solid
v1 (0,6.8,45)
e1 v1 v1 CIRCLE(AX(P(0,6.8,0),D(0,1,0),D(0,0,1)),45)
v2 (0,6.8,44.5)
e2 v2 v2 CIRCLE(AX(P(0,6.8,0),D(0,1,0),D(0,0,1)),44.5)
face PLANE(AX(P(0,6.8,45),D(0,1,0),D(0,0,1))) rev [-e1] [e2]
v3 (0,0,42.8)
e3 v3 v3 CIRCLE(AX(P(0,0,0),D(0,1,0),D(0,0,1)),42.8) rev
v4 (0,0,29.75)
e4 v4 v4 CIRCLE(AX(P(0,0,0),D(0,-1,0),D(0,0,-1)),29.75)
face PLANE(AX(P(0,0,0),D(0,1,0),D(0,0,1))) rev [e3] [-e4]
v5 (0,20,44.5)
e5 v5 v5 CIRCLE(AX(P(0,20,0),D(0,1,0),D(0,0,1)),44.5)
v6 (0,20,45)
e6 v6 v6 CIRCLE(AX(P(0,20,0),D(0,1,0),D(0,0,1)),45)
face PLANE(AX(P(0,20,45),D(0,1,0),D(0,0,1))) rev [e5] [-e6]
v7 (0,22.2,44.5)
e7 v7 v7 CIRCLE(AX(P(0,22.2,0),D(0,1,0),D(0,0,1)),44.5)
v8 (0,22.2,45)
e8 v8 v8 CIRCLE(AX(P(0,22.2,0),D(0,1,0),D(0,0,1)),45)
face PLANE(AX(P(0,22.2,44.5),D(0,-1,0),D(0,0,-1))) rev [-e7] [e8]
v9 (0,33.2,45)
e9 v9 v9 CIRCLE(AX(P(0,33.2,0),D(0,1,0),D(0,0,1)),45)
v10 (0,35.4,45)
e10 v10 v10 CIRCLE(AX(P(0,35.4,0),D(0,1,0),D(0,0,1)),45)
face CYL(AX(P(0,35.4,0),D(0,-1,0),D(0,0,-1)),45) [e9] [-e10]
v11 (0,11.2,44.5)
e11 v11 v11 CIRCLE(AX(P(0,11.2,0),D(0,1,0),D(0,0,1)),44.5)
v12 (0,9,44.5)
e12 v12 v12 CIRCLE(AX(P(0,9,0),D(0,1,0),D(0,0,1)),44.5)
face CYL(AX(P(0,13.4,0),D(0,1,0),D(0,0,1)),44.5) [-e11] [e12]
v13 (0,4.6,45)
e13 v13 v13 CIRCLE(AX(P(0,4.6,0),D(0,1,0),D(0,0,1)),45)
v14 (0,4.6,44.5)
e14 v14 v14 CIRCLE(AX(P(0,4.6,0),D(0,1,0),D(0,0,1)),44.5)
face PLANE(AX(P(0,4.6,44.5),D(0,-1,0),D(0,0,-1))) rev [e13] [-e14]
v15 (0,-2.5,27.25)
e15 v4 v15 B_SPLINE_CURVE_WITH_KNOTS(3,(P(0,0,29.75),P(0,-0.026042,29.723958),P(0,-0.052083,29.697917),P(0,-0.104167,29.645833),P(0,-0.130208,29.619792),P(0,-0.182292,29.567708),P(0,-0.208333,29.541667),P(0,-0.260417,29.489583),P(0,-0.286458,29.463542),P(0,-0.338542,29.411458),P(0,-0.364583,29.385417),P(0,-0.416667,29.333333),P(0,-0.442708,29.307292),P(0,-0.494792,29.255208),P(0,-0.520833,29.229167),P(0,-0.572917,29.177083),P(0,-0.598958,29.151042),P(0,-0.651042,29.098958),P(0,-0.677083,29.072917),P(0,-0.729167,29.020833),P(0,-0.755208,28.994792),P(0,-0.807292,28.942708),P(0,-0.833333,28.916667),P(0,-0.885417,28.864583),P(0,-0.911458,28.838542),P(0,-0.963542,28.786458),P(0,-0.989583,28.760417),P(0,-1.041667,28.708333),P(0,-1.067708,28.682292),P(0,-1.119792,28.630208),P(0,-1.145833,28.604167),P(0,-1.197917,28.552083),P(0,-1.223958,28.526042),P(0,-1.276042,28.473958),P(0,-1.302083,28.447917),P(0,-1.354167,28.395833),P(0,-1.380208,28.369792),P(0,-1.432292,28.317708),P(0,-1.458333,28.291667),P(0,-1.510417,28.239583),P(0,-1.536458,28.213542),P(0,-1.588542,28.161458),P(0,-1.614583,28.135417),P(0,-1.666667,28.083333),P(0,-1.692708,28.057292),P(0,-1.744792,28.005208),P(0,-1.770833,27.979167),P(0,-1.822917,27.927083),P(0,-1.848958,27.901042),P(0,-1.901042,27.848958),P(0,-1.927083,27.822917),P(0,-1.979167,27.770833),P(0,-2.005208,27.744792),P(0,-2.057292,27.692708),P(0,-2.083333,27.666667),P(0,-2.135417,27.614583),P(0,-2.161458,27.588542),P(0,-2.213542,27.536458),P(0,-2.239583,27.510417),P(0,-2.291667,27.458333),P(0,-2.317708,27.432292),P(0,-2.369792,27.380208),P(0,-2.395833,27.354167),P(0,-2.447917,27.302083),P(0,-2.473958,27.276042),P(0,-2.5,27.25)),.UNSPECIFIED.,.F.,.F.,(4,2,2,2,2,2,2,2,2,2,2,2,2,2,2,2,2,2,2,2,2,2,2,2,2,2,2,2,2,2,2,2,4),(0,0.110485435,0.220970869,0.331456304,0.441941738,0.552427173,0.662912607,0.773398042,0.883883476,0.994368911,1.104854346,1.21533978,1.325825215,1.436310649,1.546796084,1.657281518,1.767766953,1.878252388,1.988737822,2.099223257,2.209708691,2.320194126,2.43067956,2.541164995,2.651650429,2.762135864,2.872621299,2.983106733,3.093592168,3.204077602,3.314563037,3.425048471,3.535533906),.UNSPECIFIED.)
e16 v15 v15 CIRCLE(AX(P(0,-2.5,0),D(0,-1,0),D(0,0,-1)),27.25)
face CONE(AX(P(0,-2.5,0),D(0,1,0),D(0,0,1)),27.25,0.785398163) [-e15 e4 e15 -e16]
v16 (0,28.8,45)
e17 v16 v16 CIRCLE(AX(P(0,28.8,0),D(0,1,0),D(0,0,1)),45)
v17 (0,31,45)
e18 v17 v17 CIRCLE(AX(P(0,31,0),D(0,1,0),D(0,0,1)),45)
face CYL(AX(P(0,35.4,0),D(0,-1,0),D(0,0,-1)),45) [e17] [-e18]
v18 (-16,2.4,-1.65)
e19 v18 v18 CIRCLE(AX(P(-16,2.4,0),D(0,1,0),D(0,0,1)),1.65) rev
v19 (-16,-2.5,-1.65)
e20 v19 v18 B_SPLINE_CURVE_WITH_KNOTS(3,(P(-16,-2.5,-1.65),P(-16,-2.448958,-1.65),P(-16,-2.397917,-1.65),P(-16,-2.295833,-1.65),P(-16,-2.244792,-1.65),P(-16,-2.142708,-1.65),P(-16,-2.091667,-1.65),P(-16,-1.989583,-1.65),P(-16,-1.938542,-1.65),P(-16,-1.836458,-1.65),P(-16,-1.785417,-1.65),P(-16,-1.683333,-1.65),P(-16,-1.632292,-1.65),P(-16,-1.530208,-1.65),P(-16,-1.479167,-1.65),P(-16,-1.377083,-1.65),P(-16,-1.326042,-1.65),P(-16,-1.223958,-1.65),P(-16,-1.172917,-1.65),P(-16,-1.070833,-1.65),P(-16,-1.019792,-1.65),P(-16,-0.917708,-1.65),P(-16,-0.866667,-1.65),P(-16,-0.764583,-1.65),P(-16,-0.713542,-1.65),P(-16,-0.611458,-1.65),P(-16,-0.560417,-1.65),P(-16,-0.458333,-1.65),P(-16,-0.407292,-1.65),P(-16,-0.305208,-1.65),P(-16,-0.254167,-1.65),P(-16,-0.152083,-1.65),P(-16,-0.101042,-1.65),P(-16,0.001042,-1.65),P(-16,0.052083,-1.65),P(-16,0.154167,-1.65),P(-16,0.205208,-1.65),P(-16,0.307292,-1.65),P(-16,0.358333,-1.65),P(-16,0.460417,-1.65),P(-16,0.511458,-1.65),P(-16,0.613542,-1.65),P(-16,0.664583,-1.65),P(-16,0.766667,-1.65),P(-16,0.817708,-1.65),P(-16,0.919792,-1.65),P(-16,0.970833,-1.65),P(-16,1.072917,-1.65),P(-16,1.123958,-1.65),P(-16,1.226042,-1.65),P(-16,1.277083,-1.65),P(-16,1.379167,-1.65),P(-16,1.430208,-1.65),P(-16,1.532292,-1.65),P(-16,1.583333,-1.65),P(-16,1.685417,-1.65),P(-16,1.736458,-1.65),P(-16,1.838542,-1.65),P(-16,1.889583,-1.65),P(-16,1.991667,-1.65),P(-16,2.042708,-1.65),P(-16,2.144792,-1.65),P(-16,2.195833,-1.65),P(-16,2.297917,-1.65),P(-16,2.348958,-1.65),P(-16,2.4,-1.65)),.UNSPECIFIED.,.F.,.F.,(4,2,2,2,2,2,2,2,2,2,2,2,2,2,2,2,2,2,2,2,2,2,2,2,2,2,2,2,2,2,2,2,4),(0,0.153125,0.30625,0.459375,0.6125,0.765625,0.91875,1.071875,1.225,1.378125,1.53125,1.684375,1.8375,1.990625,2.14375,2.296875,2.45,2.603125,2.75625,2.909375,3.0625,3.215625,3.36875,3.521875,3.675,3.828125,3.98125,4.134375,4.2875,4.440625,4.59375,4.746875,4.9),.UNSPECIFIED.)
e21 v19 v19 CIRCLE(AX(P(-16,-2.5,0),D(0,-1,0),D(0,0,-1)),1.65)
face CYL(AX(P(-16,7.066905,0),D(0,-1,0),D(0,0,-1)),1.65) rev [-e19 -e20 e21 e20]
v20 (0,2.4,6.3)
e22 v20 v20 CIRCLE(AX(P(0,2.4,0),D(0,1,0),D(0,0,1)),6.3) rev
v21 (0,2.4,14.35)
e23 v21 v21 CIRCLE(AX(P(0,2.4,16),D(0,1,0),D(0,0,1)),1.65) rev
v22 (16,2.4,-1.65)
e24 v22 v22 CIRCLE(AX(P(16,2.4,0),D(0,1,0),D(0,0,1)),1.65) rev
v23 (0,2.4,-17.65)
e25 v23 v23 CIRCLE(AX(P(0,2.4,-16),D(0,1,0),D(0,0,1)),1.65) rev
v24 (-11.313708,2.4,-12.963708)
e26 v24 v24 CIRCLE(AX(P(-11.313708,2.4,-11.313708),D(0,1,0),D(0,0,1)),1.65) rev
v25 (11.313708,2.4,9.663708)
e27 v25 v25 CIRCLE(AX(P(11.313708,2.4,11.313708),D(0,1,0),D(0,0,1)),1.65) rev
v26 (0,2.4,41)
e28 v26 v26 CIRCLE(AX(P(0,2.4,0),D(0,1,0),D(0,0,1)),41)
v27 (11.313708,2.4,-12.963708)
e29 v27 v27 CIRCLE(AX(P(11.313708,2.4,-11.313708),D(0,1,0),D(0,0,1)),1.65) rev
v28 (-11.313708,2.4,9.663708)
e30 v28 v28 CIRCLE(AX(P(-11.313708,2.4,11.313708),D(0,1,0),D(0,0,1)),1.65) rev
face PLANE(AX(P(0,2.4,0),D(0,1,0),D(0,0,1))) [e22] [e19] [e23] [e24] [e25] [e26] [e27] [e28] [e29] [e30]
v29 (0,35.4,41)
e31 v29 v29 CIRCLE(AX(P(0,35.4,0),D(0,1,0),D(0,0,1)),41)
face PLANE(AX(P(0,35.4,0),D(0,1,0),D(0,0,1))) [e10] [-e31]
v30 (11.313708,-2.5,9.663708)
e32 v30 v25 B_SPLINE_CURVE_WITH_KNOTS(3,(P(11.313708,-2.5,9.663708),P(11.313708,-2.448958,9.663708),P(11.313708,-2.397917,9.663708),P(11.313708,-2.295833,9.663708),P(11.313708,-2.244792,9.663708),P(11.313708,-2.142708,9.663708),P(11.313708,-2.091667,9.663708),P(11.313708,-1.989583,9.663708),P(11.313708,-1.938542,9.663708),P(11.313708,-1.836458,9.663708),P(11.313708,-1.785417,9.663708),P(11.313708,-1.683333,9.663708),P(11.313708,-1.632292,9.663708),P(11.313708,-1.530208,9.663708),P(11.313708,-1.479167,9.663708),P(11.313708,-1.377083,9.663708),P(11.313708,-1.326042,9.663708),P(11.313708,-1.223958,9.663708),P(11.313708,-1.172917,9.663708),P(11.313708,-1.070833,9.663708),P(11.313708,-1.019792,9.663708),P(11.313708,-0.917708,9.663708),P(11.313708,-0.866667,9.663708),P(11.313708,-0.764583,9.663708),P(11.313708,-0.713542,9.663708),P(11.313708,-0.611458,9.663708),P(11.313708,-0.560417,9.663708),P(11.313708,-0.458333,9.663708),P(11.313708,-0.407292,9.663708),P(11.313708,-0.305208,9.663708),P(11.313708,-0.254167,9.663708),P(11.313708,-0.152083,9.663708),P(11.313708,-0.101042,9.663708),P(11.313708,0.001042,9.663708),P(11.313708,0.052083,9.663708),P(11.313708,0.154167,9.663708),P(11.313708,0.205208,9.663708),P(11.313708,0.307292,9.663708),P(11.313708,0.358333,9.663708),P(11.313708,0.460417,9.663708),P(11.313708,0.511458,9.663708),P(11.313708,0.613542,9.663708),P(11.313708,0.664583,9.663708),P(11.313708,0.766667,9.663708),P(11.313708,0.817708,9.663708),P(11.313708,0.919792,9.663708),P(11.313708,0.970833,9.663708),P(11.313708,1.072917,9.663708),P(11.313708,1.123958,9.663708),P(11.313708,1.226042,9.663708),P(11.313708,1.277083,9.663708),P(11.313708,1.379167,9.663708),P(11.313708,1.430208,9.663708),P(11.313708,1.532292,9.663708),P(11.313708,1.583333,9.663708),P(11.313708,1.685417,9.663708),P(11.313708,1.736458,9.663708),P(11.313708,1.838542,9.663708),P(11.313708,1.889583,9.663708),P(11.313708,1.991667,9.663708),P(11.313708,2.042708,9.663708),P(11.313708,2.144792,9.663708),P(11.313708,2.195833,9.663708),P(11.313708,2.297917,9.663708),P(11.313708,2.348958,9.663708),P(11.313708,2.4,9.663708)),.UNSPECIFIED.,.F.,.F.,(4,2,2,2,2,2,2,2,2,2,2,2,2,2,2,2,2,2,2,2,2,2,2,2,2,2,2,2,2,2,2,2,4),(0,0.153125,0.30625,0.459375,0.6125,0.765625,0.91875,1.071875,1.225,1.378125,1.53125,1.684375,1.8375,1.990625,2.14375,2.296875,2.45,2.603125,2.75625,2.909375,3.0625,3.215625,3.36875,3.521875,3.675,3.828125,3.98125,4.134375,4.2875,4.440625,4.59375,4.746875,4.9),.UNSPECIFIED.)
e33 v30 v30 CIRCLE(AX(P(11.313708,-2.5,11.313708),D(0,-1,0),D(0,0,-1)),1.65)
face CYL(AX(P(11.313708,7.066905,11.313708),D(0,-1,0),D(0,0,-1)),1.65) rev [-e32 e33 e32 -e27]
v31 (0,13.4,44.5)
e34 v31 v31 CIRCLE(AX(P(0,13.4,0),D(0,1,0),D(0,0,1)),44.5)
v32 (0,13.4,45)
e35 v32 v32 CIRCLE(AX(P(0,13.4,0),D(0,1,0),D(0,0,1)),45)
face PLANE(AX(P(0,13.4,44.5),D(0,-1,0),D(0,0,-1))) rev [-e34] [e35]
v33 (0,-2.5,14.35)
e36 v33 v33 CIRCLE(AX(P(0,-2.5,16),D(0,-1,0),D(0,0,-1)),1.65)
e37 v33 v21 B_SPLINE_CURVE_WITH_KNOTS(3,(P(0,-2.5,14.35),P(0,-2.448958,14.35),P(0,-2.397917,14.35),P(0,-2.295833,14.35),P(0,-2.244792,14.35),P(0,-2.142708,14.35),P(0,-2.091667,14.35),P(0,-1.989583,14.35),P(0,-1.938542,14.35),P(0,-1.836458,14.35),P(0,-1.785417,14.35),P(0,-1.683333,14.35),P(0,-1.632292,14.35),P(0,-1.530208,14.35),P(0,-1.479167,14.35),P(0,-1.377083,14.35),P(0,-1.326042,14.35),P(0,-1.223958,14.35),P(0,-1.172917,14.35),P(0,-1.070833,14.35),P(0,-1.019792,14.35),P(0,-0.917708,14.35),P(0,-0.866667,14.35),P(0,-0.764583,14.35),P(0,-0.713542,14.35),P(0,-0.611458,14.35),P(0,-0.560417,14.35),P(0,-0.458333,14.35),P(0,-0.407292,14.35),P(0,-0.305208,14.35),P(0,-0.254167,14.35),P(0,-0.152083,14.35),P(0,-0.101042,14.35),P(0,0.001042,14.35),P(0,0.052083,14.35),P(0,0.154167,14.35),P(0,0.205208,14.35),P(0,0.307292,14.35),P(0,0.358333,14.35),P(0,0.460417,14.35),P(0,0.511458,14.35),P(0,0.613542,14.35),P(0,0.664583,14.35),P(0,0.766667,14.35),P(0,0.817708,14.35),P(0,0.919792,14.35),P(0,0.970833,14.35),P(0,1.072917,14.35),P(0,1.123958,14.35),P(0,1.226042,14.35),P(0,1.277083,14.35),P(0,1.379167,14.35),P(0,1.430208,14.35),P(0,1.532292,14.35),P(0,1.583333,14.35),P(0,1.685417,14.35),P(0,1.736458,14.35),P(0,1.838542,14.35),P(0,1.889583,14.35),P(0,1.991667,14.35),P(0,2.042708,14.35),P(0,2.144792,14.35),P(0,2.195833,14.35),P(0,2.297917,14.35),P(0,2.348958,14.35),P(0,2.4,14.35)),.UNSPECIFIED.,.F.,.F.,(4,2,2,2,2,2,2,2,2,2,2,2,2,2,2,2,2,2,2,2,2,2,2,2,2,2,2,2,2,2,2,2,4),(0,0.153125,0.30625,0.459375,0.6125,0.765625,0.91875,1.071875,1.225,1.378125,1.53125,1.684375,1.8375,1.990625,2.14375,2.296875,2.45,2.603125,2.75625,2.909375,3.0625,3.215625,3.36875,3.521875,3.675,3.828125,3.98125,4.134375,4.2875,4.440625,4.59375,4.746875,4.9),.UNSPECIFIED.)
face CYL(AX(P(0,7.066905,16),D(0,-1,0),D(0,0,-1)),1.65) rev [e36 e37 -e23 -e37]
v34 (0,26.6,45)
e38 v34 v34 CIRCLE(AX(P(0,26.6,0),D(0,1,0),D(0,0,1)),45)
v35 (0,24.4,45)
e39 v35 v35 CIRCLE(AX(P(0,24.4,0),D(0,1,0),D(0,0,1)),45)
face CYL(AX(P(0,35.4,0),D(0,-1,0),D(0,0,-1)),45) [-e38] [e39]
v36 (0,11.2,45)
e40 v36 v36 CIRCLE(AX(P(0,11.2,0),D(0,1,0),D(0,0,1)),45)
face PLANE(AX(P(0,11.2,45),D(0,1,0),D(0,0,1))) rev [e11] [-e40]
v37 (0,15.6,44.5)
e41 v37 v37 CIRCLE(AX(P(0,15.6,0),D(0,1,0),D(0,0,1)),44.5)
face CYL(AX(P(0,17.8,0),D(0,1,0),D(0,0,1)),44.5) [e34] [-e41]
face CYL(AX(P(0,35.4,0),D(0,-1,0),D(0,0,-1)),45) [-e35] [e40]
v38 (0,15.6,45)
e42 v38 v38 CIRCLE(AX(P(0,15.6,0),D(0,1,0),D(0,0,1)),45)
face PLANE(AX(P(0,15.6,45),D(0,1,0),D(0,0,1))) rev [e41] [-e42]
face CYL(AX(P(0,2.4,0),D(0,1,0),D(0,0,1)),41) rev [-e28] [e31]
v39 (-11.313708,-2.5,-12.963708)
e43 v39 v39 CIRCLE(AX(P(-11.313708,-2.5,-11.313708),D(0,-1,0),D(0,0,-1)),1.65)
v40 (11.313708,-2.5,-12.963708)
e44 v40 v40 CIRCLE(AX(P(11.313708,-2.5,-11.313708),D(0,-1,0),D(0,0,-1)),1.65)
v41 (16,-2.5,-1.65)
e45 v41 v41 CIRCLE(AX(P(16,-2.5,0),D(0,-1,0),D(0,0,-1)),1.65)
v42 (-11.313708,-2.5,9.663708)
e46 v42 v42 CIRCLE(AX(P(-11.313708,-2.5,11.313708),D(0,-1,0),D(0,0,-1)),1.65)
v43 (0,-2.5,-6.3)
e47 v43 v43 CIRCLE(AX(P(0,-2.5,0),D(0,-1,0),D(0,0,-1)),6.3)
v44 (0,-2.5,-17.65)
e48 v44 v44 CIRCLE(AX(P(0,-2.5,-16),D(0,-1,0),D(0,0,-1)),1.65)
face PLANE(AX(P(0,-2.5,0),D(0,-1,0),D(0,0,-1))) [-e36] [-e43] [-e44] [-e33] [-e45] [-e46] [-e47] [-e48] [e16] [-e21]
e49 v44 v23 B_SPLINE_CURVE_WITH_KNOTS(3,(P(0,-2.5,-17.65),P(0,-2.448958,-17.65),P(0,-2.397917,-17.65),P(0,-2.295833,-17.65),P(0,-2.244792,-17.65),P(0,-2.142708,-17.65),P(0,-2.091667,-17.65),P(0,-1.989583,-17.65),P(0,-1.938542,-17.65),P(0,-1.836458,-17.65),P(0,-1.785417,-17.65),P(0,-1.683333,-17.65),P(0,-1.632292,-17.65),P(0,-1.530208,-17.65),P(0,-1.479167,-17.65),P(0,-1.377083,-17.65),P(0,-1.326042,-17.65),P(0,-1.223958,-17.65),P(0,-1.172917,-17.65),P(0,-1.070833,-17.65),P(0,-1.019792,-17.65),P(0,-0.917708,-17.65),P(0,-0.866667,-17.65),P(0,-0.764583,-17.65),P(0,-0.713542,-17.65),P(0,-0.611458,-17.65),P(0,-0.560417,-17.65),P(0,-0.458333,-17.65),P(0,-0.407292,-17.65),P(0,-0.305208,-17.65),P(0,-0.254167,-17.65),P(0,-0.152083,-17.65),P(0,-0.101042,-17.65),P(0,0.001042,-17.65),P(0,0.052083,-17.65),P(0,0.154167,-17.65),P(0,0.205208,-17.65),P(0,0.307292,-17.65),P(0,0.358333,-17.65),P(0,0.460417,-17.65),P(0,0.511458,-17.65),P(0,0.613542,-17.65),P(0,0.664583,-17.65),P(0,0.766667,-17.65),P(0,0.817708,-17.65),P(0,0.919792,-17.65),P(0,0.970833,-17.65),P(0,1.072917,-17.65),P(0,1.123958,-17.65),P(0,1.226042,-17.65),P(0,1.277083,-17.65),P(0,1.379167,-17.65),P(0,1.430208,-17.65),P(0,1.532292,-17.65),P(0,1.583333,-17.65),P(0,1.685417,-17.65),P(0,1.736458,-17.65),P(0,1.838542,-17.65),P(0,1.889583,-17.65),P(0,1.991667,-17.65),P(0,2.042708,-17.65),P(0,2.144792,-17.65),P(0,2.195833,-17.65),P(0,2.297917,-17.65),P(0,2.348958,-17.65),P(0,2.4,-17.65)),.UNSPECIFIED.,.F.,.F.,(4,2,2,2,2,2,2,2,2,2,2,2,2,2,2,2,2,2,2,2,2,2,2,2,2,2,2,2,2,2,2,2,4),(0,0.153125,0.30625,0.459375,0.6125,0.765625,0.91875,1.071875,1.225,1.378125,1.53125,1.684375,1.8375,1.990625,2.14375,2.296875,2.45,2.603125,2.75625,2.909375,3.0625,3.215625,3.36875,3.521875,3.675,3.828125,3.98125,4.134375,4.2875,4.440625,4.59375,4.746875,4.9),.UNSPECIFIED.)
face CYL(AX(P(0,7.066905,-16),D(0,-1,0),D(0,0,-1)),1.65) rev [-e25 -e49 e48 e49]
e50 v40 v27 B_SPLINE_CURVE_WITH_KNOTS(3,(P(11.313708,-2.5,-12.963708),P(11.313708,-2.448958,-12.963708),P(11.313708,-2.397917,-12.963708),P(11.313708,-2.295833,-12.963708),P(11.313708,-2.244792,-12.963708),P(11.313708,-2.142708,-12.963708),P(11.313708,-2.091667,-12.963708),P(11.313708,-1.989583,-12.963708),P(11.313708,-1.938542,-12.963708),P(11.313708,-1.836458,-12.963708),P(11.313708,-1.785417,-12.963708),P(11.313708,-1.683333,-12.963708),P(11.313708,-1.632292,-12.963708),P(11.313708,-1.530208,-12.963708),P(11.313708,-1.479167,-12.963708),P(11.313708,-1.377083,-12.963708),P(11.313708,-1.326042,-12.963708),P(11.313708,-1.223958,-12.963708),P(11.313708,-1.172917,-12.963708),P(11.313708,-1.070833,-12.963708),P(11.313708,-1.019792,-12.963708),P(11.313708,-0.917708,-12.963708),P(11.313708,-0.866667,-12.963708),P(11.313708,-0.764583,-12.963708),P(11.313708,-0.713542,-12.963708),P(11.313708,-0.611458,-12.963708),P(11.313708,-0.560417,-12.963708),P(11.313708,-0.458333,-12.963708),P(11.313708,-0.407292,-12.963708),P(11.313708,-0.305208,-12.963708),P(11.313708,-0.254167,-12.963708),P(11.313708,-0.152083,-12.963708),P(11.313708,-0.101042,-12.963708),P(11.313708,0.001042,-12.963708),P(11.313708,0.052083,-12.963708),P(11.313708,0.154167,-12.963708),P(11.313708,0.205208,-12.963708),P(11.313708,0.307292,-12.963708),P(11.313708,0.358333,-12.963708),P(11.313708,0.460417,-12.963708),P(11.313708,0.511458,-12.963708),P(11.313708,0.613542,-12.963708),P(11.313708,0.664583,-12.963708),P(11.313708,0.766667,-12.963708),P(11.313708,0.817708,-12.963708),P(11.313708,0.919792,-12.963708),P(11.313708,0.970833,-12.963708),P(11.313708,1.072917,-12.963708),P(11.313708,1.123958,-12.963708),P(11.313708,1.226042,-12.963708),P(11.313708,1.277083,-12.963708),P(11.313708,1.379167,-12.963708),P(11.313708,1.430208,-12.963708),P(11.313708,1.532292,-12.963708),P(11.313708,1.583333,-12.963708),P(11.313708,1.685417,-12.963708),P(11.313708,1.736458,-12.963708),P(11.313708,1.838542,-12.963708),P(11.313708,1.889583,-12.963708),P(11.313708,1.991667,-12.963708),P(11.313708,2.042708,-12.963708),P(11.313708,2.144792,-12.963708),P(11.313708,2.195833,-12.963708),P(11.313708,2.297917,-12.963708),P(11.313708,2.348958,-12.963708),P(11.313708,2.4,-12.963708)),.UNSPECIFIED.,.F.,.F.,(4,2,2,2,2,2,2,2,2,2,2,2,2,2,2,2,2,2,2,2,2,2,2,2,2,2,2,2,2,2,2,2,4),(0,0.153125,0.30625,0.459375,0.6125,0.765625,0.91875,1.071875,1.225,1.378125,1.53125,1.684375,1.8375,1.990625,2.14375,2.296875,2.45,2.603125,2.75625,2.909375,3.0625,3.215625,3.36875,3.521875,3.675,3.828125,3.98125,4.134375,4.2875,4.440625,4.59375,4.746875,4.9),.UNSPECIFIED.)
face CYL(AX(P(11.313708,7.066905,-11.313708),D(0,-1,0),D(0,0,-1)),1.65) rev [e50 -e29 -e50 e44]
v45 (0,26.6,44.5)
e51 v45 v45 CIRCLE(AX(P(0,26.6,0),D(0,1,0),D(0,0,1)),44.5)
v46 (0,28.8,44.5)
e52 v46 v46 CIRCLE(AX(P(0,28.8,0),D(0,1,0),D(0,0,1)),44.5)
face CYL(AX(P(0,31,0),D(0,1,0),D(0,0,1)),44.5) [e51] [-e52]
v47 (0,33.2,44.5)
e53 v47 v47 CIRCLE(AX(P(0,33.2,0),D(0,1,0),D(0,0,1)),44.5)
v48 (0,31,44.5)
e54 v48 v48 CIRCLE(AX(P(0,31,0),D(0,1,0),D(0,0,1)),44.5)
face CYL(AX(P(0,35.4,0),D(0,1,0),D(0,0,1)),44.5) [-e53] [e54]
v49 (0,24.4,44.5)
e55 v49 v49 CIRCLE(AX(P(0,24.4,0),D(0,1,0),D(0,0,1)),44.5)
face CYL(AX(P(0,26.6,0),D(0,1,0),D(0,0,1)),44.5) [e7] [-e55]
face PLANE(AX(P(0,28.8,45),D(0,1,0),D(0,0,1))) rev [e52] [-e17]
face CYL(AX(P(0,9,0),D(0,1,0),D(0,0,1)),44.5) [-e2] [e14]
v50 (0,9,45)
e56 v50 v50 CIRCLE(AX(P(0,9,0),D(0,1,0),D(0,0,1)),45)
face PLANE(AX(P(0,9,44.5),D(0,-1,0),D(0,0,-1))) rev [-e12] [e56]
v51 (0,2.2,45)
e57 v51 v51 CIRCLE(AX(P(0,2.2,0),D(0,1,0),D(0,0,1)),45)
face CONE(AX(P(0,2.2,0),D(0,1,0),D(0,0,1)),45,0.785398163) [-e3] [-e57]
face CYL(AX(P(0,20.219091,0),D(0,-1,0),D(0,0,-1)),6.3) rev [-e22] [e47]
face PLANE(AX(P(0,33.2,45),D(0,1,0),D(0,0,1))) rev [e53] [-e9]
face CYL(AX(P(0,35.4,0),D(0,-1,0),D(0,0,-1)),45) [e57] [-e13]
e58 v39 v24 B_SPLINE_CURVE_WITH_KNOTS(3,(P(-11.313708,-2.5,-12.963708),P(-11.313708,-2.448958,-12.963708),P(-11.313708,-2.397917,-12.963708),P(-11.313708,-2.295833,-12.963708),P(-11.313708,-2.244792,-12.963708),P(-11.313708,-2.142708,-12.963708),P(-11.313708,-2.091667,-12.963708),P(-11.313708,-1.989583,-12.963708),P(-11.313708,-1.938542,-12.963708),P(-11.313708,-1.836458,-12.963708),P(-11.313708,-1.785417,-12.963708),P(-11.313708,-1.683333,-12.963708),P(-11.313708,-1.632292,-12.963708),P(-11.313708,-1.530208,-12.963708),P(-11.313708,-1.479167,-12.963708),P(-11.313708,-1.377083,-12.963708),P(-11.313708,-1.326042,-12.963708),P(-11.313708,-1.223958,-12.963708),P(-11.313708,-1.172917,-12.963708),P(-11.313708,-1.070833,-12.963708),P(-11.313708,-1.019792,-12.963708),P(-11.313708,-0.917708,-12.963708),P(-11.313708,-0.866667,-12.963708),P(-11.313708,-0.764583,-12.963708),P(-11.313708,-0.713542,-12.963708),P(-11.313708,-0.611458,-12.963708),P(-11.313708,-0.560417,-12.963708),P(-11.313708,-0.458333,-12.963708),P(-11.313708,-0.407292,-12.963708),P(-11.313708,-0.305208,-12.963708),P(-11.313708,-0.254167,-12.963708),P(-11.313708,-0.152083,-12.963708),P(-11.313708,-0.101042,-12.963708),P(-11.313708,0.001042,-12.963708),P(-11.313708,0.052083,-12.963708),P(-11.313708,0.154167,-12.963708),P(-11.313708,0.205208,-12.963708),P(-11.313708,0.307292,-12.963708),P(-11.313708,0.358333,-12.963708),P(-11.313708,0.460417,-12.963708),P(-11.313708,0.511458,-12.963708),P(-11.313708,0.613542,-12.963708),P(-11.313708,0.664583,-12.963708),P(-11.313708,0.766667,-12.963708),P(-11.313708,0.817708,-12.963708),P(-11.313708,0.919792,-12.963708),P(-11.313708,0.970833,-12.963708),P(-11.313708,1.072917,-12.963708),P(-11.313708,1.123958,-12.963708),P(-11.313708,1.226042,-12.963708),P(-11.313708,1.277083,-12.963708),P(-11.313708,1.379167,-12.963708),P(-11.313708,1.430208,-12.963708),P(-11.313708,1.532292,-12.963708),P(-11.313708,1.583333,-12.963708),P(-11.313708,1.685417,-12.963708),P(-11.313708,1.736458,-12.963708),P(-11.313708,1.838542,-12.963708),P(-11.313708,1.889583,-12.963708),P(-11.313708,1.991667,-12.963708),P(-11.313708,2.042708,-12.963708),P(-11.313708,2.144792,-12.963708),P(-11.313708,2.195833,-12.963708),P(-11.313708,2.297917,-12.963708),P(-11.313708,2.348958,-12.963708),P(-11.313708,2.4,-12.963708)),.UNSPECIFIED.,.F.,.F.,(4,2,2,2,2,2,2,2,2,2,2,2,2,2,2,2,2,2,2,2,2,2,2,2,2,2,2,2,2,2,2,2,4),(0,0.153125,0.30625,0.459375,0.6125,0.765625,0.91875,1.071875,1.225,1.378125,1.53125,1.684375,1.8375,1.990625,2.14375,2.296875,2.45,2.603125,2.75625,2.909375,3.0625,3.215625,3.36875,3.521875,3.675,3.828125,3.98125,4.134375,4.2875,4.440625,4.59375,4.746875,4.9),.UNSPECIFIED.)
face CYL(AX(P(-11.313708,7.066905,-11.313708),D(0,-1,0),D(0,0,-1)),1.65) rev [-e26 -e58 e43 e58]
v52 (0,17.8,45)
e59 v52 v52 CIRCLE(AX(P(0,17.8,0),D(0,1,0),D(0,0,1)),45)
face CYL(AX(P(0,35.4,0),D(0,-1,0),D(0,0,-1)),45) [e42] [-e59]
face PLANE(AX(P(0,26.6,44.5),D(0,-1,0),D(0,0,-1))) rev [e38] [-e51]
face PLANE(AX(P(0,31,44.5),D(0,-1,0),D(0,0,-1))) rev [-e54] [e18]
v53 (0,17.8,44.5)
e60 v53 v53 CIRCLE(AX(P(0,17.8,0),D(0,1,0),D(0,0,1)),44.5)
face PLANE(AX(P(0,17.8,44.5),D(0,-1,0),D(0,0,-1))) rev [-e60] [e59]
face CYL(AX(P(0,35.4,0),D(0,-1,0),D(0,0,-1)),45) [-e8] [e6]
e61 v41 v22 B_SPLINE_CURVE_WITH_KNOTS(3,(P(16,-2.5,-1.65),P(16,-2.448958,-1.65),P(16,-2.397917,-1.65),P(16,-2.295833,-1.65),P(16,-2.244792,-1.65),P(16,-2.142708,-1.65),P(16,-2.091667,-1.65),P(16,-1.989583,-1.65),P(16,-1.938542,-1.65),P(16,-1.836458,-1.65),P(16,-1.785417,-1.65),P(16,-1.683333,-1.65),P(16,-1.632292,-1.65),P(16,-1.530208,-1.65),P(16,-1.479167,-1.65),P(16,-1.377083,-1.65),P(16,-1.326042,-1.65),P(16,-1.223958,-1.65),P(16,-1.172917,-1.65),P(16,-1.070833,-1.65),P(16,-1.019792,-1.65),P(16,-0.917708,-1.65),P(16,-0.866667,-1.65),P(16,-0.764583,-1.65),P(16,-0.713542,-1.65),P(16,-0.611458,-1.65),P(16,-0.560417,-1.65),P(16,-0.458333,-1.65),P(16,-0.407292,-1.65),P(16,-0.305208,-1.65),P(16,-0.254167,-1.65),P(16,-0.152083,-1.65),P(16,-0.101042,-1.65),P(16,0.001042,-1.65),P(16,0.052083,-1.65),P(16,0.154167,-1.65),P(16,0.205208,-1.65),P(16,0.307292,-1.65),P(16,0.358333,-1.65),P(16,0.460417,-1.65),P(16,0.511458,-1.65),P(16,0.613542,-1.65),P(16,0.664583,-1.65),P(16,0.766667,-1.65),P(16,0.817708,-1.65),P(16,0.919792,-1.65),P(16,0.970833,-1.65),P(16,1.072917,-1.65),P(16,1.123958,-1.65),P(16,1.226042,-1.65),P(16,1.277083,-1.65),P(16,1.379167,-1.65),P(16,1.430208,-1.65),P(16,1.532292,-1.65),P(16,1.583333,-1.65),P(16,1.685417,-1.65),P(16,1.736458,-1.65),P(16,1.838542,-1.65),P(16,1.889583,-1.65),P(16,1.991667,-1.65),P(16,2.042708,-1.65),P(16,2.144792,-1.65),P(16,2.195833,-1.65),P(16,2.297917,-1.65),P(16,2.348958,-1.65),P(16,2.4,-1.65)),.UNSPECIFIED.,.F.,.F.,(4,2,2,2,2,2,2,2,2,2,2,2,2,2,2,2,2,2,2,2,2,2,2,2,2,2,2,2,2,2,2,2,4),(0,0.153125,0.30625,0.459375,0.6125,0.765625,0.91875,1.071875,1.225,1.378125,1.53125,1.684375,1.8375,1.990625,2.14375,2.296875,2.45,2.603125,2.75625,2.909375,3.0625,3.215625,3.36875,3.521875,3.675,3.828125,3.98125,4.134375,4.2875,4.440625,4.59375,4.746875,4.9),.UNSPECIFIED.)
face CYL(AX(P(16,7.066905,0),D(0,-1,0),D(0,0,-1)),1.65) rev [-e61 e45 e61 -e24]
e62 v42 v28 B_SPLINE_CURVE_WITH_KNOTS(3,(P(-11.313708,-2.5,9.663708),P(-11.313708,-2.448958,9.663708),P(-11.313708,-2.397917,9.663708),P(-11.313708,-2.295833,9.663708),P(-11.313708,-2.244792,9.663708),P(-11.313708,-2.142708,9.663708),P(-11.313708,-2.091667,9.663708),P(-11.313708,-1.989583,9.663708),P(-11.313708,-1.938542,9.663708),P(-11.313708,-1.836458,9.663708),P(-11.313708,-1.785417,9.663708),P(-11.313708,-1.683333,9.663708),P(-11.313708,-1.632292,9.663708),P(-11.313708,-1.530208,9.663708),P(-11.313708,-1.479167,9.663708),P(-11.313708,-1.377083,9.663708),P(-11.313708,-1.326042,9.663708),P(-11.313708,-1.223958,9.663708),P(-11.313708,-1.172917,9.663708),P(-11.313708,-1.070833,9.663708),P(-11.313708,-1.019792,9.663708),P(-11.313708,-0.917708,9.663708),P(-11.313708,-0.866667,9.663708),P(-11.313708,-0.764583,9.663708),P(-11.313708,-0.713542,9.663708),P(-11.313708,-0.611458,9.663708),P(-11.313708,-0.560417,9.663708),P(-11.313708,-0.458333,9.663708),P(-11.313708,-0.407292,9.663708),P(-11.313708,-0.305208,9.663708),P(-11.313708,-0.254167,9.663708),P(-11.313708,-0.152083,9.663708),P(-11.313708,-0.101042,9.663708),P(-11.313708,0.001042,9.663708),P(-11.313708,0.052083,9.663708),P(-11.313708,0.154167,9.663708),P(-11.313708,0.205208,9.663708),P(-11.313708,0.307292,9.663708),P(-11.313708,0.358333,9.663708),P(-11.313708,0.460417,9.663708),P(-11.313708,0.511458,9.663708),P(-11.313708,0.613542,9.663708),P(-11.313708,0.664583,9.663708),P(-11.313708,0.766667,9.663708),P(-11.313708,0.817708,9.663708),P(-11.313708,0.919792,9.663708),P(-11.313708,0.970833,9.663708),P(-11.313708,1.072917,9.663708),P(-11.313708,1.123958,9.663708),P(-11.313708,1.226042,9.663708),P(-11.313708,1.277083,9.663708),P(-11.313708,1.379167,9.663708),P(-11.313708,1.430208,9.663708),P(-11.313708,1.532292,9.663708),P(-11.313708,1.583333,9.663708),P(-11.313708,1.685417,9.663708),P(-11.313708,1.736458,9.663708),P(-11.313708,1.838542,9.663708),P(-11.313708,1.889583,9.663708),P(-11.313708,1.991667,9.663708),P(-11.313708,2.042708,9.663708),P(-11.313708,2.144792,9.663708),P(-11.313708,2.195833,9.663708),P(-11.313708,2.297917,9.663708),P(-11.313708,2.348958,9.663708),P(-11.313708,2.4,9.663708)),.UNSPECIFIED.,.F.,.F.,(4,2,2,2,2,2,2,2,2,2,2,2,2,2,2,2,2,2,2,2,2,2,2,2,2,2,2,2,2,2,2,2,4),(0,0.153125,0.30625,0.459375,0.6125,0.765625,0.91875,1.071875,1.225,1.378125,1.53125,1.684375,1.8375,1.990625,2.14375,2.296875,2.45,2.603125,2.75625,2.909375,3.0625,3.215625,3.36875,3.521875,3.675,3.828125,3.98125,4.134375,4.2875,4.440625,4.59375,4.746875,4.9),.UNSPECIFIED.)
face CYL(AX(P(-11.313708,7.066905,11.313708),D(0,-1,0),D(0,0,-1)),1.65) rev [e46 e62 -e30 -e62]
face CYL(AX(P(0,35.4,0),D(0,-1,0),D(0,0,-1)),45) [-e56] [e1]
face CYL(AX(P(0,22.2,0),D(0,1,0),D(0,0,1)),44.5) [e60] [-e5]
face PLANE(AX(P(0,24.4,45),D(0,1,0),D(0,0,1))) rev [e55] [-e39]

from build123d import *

# Parameters (mm, degrees)
SKETCH1_R           = 45
BOSS_EXTRUDE1_DEPTH = 35.4
SKETCH2_R           = 41
CUT_EXTRUDE1_DEPTH  = 33
SKETCH3_R           = 29.75
BOSS_EXTRUDE2_DEPTH = 2.5
CHAMFER1_SIZE       = 2.5
SKETCH4_R           = 6.3
CUT_EXTRUDE2_DEPTH  = 4.9
SKETCH5_R           = 1.65
CUT_EXTRUDE3_DEPTH  = 4.9
SKETCH7_W           = 0.5
SKETCH7_H           = 2.2
LPATTERN1_COUNT     = 7
LPATTERN1_PITCH     = 4.4
CHAMFER2_SIZE       = 2.2


with BuildPart() as part:
    # Sketch1 → Boss-Extrude1 (new body)
    with BuildSketch(Plane(origin=(0, 0, 0), x_dir=(1, 0, 0), z_dir=(0, 1, 0))):
        with Locations(Location((0, 0, 0), (0, 0, 270))):
            Circle(SKETCH1_R)
    extrude(amount=BOSS_EXTRUDE1_DEPTH)

    # Sketch2 → Cut-Extrude1 (cut)
    with BuildSketch(Plane(origin=(0, 35.4, 0), x_dir=(1, 0, 0), z_dir=(0, 1, 0))):
        with Locations(Location((0, 0, 0), (0, 0, 270))):
            Circle(SKETCH2_R)
    extrude(amount=-CUT_EXTRUDE1_DEPTH, mode=Mode.SUBTRACT)

    # Sketch3 → Boss-Extrude2 (add)
    with BuildSketch(Plane.XZ):
        with Locations(Location((0, 0, 0), (0, 0, 270))):
            Circle(SKETCH3_R)
    extrude(amount=BOSS_EXTRUDE2_DEPTH)

    # Chamfer1
    chamfer1_edges = [part.edges().sort_by_distance(p)[0] for p in [
        (0, -2.5, 29.75),
    ]]
    chamfer(chamfer1_edges, length=CHAMFER1_SIZE - 0.0001)  # a hair under: the kernel refuses the full size

    # Sketch4 → Cut-Extrude2 (cut)
    with BuildSketch(Plane.XZ.offset(2.5)):
        with Locations(Location((0, 0, 0), (0, 0, 270))):
            Circle(SKETCH4_R)
    extrude(amount=-CUT_EXTRUDE2_DEPTH, mode=Mode.SUBTRACT)

    # Sketch5 → Cut-Extrude3 (cut)
    with BuildSketch(Plane.XZ.offset(2.5)):
        with Locations(Location((-16, 0, 0), (0, 0, 270))):
            Circle(SKETCH5_R)
        with Locations(Location((-11.313708499, 11.313708499, 0), (0, 0, 270))):
            Circle(SKETCH5_R)
        with Locations(Location((0, 16, 0), (0, 0, 270))):
            Circle(SKETCH5_R)
        with Locations(Location((11.313708499, 11.313708499, 0), (0, 0, 270))):
            Circle(SKETCH5_R)
        with Locations(Location((16, 0, 0), (0, 0, 270))):
            Circle(SKETCH5_R)
        with Locations(Location((11.313708499, -11.313708499, 0), (0, 0, 270))):
            Circle(SKETCH5_R)
        with Locations(Location((0, -16, 0), (0, 0, 270))):
            Circle(SKETCH5_R)
        with Locations(Location((-11.313708499, -11.313708499, 0), (0, 0, 270))):
            Circle(SKETCH5_R)
    extrude(amount=-CUT_EXTRUDE3_DEPTH, mode=Mode.SUBTRACT)

    # Sketch7 → Cut-Revolve1 (revolve, cut)
    with BuildSketch(Plane(origin=(0, 0, 0), x_dir=(0, 0, -1), z_dir=(1, 0, 0))):
        with Locations((-44.75, 32.1)):
            Rectangle(SKETCH7_W, SKETCH7_H)
    cut_revolve1 = revolve(axis=Axis((0, 35.4, 0), (0, -1, 0)), mode=Mode.SUBTRACT)

    # LPattern1: Cut-Revolve1 ×7
    with Locations(*[(0, -i * LPATTERN1_PITCH, 0) for i in range(1, LPATTERN1_COUNT)]):
        add(cut_revolve1, mode=Mode.SUBTRACT)

    # Chamfer2
    chamfer2_edges = [part.edges().sort_by_distance(p)[0] for p in [
        (0, 0, -45),
    ]]
    chamfer(chamfer2_edges, length=CHAMFER2_SIZE)


solid = part.part
